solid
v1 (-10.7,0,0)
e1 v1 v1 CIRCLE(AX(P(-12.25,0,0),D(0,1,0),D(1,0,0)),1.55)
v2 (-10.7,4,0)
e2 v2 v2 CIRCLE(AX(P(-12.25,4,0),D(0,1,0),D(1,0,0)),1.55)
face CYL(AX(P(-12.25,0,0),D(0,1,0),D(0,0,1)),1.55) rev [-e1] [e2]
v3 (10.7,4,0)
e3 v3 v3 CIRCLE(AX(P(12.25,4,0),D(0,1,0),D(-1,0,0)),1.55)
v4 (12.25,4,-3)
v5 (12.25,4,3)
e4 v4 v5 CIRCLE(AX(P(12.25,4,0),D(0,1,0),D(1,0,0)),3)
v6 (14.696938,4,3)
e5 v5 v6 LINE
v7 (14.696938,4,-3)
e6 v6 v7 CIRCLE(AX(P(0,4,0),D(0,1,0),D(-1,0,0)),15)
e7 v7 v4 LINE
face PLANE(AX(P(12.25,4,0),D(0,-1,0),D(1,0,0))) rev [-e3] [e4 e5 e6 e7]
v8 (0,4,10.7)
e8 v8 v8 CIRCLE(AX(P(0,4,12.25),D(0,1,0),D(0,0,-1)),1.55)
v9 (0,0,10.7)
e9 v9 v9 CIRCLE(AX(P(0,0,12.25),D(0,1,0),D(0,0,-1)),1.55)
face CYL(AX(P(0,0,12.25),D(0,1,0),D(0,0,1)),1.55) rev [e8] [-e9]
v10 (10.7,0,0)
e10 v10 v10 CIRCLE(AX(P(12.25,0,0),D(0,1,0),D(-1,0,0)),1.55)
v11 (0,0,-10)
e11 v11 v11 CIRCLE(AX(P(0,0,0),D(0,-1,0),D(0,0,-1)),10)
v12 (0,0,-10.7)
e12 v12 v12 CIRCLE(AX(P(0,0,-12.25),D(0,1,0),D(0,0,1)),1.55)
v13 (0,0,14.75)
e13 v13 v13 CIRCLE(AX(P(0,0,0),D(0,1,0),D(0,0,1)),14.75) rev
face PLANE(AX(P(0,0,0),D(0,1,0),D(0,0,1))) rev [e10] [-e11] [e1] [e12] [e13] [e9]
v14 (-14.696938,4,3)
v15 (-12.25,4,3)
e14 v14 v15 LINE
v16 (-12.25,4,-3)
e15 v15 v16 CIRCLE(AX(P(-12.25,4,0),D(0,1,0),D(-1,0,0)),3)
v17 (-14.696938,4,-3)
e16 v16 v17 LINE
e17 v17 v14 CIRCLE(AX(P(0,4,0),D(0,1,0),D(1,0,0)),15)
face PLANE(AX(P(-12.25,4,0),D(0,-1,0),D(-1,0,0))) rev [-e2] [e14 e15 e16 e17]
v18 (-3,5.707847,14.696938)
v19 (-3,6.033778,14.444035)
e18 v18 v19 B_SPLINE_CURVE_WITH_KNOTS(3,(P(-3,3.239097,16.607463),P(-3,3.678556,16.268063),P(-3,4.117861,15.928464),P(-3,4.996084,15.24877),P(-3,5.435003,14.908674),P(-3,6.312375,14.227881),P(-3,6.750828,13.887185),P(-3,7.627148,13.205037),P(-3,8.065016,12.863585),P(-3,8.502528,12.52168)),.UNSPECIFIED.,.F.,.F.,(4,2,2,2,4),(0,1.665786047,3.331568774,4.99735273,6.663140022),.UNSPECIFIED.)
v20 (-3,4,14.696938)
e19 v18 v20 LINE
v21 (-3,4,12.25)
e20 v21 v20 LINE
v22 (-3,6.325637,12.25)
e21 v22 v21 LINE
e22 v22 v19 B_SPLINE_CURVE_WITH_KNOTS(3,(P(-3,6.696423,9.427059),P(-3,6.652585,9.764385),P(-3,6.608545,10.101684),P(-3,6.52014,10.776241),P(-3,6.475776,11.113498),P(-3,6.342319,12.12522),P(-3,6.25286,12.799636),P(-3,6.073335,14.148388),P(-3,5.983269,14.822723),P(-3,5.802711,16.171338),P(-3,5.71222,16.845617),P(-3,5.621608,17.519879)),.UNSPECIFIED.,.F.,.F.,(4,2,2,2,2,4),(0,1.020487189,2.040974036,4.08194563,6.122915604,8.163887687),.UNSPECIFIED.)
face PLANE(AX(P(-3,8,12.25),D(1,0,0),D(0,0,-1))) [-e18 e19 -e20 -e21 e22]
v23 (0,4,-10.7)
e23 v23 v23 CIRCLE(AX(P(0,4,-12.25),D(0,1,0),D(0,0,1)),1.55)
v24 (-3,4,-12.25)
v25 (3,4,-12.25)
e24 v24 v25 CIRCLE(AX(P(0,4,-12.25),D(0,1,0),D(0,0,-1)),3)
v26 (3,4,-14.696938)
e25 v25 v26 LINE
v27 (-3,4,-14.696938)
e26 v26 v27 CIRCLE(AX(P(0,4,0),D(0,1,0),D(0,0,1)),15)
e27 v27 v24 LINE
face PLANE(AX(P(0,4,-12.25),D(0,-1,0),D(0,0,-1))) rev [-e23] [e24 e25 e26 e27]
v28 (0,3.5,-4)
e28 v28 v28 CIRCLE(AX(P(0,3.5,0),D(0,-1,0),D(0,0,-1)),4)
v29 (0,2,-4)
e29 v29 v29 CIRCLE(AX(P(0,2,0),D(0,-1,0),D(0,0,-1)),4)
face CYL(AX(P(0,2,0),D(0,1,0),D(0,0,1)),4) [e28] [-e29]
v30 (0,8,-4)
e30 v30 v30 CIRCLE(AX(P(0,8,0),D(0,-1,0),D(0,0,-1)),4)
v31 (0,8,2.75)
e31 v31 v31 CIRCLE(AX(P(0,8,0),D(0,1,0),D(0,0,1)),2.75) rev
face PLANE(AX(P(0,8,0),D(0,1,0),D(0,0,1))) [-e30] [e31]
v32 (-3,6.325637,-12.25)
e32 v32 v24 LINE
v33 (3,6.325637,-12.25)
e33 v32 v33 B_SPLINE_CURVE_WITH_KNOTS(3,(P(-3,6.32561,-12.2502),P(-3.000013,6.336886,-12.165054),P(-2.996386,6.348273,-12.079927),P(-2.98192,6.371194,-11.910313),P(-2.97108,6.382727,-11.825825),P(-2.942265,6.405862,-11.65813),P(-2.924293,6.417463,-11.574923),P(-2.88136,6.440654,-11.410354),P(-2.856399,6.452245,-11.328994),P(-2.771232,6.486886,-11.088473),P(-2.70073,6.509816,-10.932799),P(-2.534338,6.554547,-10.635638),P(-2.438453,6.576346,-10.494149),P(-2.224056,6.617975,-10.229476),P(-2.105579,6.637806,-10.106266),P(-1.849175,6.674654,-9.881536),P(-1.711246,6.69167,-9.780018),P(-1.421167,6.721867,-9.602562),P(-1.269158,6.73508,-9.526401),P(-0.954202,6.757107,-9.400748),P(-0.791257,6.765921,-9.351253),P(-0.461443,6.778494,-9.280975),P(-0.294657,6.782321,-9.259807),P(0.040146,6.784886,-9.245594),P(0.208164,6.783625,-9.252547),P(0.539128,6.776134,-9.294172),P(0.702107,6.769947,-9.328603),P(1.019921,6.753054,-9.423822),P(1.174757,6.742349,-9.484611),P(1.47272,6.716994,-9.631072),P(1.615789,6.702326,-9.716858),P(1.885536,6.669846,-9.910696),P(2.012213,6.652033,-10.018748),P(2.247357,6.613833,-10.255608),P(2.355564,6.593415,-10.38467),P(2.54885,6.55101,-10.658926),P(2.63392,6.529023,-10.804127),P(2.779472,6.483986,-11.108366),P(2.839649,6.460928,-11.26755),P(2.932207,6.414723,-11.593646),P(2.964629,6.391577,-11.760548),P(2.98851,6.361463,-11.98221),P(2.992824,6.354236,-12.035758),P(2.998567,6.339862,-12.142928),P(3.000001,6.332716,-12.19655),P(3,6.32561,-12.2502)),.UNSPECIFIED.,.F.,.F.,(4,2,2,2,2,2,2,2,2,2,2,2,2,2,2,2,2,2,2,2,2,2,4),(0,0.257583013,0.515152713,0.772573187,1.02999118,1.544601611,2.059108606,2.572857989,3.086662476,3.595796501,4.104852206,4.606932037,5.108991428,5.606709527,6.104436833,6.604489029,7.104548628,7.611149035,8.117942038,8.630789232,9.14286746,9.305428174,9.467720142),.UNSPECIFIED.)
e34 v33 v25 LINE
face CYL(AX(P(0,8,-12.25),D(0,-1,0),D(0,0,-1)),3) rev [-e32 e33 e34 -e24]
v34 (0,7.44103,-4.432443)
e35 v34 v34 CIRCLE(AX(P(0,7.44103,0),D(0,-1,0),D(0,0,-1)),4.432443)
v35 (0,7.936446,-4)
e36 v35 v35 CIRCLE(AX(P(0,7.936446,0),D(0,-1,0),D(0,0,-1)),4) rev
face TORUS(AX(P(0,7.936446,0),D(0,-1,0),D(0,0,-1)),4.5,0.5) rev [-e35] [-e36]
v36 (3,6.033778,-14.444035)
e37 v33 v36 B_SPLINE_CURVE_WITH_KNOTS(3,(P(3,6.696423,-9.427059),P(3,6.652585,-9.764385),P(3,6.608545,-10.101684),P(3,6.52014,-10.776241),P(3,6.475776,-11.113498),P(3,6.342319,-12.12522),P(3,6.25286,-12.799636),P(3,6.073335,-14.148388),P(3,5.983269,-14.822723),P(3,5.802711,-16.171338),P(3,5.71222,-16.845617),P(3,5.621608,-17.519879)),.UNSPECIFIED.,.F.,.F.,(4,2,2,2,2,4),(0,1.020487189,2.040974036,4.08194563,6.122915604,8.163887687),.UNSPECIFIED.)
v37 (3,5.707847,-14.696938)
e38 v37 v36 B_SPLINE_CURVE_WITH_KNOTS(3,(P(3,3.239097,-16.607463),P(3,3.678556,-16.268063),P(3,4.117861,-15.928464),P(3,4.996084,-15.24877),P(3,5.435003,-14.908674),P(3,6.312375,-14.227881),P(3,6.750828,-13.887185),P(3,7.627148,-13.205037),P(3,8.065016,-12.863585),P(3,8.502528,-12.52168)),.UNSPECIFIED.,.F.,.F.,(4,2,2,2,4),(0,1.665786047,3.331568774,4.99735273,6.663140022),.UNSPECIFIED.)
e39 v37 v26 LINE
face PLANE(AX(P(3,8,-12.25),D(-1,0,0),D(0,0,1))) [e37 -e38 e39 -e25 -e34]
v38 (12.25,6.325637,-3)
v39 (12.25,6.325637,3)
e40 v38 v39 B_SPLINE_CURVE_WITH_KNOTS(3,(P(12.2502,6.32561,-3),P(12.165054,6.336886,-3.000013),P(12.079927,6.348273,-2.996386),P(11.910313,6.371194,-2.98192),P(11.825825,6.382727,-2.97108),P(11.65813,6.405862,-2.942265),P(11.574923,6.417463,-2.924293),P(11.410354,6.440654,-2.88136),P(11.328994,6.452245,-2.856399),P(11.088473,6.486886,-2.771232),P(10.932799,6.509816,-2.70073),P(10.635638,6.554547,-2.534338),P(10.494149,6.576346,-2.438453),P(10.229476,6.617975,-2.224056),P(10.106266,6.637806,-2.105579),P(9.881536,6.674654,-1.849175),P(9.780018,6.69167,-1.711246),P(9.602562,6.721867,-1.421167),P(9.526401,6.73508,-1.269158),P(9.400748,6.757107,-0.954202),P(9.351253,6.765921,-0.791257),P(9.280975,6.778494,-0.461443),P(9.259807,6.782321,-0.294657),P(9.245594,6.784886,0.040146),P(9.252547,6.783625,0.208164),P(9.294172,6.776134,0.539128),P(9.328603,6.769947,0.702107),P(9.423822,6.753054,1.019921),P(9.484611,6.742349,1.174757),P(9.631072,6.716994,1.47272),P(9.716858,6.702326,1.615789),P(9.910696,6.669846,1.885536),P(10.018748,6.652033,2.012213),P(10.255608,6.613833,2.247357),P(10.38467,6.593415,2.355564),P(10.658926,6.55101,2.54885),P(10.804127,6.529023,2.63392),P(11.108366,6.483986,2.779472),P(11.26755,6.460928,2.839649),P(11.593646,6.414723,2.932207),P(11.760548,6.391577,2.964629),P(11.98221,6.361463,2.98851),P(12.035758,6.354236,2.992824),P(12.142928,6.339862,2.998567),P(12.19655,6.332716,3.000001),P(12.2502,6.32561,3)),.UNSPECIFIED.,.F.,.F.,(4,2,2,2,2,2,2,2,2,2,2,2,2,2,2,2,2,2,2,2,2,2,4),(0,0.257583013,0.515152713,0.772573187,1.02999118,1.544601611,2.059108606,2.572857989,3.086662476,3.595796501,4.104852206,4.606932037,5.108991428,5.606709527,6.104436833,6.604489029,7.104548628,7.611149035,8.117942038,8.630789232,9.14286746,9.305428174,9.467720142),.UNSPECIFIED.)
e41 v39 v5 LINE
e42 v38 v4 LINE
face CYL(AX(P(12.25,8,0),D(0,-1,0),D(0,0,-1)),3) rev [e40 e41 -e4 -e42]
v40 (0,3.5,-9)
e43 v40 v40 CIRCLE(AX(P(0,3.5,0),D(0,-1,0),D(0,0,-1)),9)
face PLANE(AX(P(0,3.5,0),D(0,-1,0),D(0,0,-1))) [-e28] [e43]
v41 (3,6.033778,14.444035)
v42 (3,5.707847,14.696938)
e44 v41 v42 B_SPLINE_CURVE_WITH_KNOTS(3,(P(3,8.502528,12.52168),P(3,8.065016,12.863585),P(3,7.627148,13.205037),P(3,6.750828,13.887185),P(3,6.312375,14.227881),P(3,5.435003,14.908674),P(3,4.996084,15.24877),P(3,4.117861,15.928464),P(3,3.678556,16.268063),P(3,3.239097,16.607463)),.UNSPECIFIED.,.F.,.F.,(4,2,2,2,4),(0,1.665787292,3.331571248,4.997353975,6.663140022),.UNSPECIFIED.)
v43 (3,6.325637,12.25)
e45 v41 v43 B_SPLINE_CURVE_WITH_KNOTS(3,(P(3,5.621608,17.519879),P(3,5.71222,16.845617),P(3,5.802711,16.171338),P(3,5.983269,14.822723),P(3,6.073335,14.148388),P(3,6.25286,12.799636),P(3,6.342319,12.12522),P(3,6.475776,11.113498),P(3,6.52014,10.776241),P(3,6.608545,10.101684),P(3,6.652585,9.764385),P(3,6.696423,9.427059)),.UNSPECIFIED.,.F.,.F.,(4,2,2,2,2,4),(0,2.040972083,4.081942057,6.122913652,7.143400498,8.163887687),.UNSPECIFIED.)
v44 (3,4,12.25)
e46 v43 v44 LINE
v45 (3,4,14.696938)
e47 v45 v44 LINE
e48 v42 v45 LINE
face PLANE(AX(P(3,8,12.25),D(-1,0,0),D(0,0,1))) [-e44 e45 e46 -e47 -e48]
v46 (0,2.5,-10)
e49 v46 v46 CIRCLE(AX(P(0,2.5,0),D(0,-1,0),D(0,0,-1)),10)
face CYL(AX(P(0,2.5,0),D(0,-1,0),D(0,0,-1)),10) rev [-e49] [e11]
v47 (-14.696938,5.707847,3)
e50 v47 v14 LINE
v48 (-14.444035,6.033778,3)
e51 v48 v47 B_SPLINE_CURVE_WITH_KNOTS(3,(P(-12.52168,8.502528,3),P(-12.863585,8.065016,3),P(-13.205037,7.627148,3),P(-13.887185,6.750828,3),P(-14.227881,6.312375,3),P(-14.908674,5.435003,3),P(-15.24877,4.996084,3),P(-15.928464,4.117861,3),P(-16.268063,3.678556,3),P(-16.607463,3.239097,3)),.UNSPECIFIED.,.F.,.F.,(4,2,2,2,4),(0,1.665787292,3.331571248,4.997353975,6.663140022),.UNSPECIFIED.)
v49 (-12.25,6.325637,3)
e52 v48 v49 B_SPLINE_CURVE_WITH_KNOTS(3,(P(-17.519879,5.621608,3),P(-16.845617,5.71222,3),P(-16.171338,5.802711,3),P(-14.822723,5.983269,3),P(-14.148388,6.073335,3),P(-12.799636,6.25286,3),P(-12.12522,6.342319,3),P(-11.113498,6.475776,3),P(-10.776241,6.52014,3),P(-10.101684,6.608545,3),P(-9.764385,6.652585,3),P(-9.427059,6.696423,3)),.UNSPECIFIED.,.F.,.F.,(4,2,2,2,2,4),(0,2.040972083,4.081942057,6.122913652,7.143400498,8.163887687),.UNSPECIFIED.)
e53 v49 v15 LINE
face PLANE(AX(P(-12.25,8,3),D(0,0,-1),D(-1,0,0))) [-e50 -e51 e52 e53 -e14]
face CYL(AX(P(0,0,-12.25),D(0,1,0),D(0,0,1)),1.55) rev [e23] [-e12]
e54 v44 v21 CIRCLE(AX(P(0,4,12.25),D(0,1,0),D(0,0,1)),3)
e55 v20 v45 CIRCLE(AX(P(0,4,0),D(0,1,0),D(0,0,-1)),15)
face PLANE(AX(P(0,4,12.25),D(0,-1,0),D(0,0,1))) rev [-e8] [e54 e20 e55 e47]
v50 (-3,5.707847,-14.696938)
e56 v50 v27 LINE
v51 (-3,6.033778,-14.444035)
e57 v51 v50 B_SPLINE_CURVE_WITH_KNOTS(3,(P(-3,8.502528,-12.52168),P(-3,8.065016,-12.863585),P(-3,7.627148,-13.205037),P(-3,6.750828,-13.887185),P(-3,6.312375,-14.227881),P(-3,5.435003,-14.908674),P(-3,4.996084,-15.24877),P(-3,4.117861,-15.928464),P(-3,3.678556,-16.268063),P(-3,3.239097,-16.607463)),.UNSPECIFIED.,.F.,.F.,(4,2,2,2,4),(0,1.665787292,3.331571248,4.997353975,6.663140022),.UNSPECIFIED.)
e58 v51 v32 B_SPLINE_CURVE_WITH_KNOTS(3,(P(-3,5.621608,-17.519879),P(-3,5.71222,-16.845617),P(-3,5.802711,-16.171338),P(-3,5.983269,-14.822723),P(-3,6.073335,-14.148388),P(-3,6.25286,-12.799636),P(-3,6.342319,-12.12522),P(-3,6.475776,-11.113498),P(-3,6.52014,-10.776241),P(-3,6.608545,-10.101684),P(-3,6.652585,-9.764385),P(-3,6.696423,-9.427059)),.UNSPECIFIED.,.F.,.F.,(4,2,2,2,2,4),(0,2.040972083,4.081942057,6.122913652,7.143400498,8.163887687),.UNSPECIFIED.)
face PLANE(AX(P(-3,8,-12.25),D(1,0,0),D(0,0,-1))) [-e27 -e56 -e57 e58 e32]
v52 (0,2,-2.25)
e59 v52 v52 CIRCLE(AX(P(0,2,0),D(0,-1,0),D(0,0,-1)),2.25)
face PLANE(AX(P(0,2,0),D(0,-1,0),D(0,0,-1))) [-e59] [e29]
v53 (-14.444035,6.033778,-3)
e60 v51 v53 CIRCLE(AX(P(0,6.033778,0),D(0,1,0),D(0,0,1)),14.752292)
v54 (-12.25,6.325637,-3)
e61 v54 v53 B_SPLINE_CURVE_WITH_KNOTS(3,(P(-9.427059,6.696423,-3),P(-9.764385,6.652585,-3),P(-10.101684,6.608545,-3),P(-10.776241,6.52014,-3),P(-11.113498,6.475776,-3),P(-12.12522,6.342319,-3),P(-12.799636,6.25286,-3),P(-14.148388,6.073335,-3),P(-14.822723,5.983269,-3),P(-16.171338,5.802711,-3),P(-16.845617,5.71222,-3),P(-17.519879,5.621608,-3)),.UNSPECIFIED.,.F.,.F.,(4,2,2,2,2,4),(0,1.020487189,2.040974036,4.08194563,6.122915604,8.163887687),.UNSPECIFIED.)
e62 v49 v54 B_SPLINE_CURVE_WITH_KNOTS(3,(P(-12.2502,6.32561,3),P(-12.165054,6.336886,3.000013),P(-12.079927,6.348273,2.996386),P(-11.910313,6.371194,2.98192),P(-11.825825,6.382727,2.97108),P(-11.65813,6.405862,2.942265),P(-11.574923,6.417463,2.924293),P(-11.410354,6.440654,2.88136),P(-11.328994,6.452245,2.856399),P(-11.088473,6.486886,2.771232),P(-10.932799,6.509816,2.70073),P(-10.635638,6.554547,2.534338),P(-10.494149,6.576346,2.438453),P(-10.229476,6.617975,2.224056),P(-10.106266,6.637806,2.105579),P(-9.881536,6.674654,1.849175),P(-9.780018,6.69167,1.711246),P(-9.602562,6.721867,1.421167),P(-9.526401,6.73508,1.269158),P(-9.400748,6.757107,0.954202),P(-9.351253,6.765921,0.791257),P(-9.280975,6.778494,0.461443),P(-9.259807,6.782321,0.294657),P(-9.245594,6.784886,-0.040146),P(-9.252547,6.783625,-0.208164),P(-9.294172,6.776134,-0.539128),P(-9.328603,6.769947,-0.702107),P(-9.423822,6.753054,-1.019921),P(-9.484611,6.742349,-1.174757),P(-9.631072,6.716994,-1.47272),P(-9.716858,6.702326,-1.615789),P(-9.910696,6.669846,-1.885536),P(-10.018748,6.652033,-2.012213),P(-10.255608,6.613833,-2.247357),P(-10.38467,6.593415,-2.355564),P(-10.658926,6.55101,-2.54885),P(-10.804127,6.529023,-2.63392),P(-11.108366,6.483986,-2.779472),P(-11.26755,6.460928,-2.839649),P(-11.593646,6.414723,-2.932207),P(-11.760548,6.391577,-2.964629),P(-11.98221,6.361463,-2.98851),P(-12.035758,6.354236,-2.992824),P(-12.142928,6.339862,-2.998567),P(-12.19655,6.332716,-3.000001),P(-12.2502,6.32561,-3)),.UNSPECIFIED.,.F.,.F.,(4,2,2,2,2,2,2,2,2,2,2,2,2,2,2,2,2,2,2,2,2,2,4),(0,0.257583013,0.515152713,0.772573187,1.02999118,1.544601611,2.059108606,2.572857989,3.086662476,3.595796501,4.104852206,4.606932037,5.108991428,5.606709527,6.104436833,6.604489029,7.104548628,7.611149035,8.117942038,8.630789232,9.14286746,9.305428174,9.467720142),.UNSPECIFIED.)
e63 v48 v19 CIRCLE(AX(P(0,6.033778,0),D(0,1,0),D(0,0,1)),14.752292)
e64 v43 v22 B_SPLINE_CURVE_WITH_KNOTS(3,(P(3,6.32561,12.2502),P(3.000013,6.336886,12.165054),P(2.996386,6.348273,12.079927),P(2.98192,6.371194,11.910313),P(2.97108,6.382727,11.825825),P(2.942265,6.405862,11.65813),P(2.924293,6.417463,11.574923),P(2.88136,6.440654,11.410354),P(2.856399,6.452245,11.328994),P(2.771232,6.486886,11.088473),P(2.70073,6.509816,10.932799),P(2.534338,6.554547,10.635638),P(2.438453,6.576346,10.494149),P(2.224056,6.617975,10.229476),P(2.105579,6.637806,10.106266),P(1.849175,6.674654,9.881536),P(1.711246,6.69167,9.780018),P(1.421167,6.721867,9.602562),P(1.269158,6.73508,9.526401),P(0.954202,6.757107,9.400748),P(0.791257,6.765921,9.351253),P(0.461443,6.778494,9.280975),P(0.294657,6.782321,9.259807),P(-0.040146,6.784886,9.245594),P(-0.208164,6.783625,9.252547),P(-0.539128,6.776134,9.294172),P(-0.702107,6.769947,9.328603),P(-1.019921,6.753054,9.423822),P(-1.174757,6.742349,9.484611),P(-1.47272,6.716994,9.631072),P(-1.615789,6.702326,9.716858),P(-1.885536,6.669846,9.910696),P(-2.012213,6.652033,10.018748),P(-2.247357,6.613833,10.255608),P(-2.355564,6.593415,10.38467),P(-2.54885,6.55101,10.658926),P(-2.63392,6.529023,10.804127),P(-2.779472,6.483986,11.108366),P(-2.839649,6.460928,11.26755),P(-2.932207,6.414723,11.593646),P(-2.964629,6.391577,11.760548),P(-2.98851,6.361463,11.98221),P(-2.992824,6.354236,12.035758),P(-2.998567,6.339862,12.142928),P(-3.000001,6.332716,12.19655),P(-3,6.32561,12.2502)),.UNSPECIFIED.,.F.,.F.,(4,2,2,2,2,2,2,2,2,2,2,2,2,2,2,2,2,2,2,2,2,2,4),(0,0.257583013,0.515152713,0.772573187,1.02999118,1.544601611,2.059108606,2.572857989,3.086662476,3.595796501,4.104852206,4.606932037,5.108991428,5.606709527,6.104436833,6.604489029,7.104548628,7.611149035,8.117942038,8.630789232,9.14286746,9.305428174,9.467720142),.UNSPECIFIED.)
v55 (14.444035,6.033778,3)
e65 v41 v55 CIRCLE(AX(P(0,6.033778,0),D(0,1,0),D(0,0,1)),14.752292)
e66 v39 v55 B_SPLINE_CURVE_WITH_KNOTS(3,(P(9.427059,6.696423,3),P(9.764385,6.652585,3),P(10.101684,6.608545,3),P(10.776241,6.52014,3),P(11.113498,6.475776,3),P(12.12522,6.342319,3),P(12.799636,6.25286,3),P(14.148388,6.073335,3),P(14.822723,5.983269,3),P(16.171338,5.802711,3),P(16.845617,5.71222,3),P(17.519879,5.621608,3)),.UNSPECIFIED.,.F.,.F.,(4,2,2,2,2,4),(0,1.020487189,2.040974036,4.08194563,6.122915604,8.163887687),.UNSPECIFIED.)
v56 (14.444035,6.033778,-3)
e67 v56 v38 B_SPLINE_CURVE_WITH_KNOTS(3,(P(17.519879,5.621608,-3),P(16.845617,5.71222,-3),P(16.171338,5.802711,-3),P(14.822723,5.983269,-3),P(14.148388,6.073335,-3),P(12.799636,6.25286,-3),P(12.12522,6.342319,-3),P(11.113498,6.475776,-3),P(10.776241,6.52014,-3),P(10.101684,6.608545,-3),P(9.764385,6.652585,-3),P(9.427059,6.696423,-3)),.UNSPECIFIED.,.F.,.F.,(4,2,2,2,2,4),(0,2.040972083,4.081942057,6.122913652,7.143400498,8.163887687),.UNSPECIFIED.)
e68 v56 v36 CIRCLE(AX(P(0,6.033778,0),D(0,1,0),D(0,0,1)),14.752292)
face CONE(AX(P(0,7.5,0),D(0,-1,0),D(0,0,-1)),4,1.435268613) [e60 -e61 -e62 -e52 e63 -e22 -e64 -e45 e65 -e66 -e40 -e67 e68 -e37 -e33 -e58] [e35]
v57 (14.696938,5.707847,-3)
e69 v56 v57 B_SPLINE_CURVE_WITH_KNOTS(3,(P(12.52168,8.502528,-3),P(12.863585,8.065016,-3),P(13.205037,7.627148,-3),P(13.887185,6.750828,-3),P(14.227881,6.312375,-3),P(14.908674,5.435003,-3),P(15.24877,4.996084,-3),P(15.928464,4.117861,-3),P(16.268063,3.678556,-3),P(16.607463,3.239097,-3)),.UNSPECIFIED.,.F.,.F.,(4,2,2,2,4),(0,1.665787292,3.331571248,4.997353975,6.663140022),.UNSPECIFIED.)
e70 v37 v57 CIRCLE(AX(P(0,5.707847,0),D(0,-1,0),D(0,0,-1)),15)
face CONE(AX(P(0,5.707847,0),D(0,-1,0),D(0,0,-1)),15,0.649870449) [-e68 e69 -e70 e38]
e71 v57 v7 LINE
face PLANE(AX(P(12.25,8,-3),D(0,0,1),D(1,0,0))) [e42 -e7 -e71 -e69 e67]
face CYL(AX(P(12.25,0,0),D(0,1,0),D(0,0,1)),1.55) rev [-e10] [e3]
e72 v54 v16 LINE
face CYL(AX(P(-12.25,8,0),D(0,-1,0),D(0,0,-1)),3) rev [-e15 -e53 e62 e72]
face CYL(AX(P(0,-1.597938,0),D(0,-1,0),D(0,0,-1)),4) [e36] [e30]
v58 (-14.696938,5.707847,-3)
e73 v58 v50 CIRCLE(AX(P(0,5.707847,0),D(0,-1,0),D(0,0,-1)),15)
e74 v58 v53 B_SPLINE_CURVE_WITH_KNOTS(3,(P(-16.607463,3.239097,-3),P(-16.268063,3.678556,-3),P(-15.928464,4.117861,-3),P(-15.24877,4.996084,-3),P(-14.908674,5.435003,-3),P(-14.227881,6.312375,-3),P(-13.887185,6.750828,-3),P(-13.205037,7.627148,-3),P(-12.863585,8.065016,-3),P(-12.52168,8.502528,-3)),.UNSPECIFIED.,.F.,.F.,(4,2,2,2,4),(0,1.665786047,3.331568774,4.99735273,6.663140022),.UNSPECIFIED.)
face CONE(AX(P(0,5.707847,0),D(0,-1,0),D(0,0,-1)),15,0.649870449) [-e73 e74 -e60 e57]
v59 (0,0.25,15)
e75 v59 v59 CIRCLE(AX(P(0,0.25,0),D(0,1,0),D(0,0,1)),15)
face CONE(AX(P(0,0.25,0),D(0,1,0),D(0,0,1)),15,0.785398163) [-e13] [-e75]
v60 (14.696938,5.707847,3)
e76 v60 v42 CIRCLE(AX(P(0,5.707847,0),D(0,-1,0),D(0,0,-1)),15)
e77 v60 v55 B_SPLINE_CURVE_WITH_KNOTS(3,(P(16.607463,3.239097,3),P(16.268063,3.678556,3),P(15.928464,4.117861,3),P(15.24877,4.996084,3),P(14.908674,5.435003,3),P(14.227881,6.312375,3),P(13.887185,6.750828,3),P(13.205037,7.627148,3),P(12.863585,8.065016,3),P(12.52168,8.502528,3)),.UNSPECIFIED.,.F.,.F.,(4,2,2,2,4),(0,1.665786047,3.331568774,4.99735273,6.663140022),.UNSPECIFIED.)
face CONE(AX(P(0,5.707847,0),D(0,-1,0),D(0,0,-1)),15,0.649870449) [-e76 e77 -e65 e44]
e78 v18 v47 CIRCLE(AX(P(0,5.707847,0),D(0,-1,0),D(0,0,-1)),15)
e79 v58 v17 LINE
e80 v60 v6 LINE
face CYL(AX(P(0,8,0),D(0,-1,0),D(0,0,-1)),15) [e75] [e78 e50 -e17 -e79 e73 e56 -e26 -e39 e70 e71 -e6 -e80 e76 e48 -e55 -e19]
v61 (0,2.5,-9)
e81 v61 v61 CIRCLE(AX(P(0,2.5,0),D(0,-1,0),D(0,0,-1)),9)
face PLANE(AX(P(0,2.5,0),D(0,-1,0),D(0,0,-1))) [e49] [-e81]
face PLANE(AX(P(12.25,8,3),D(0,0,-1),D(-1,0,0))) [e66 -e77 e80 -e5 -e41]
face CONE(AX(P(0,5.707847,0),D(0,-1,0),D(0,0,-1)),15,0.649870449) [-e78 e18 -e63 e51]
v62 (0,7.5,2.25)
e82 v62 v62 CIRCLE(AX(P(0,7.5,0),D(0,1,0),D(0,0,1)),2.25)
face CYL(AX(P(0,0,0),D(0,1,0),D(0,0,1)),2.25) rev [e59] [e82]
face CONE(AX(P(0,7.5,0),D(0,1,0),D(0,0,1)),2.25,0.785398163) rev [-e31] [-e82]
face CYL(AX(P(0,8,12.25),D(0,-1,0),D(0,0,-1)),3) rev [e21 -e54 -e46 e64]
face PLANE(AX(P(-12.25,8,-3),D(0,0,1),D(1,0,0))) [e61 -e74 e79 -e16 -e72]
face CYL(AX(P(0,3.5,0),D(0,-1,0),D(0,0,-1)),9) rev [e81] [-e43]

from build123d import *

# Parameters (mm, degrees)
SKETCH_1_R               = 15
EXTRUDE_314_DEPTH        = 8
SKETCH_3_R               = 10
CUT_EXTRUDE_1_DEPTH      = 2.5
SKETCH_5_R               = 9
CUT_EXTRUDE_3_DEPTH      = 1
SKETCH_6_R               = 4
EXTRUDE_2_DEPTH          = 1.5
SKETCH_7_R               = 2.25
CUT_EXTRUDE_4_DEPTH      = 23.671568098
CHAMFER_3_SIZE           = 0.5
CHAMFER_4_SIZE           = 0.25
CHAMFER_4_SIZE2          = 0.292152675
CHAMFER_5_SIZE           = 0.25
FILLET_1_R               = 0.5
CUT_EXTRUDE_START        = 4
CUT_EXTRUDE_6_DEPTH      = 19.671568265
SKETCH_9_R               = 1.55
CUT_EXTRUDE_7_DEPTH      = 22.587033302
PATTERN_CIRCULAR_1_COUNT = 4


with BuildPart() as part:
    # Эскиз1 → Extrude 314 (new body)
    with BuildSketch(Plane(origin=(0, 0, 0), x_dir=(1, 0, 0), z_dir=(0, 1, 0))):
        Circle(SKETCH_1_R)
    extrude(amount=EXTRUDE_314_DEPTH)

    # Эскиз2 → Вырез-Повернуть1 (revolve, cut)
    with BuildSketch(Plane.XY):
        Polygon((4, 8), (15, 8), (15, 6), (4, 7.5), align=None)
    revolve(axis=Axis((0, -1.597938144, 0), (0, 1, 0)), mode=Mode.SUBTRACT)

    # Эскиз3 → Вырез-Вытянуть1 (cut)
    with BuildSketch(Plane(origin=(0, 0, 0), x_dir=(-1, 0, 0), z_dir=(0, -1, 0))):
        Circle(SKETCH_3_R)
    extrude(amount=-CUT_EXTRUDE_1_DEPTH, mode=Mode.SUBTRACT)

    # Эскиз5 → Вырез-Вытянуть3 (cut)
    with BuildSketch(Plane.XZ.offset(-2.5)):
        Circle(SKETCH_5_R)
    extrude(amount=-CUT_EXTRUDE_3_DEPTH, mode=Mode.SUBTRACT)

    # Эскиз6 → Бобышка-Вытянуть2 (add)
    with BuildSketch(Plane.XZ.offset(-3.5)):
        Circle(SKETCH_6_R)
    extrude(amount=EXTRUDE_2_DEPTH)

    # Эскиз7 → Вырез-Вытянуть4 (cut, through all)
    with BuildSketch(Plane(origin=(0, 8, 0), x_dir=(1, 0, 0), z_dir=(0, 1, 0))):
        Circle(SKETCH_7_R)
    extrude(amount=-CUT_EXTRUDE_4_DEPTH, mode=Mode.SUBTRACT)

    # Фаска3
    chamfer_3_edges = [part.edges().sort_by_distance(p)[0] for p in [
        (-2.25, 8, 0),
    ]]
    chamfer(chamfer_3_edges, length=CHAMFER_3_SIZE)

    # Фаска4
    chamfer_4_edges = [part.edges().sort_by_distance(p)[0] for p in [
        (-15, 6, 0),
    ]]
    chamfer_4_side = [part.faces().sort_by_distance(p)[0] for p in [
        (-9.5, 6.75, 0),
    ]]
    chamfer(chamfer_4_edges, length=CHAMFER_4_SIZE, length2=CHAMFER_4_SIZE2, reference=chamfer_4_side[0])

    # Фаска5
    chamfer_5_edges = [part.edges().sort_by_distance(p)[0] for p in [
        (-15, 0, 0),
    ]]
    chamfer(chamfer_5_edges, length=CHAMFER_5_SIZE)

    # Скругление1
    fillet_1_edges = [part.edges().sort_by_distance(p)[0] for p in [
        (-4, 7.5, 0),
    ]]
    fillet(fillet_1_edges, radius=FILLET_1_R)

    # Эскиз8 → Вырез-Вытянуть6 (cut, through all)
    with BuildSketch(Plane(origin=(0, 0, 0), x_dir=(1, 0, 0), z_dir=(0, 1, 0)).offset(CUT_EXTRUDE_START)):
        with BuildLine():
            Line((3, 12.25), (3, 14.696938457))
            ThreePointArc((3, 14.696938457), (0, 15), (-3, 14.696938457))
            Line((-3, 14.696938457), (-3, 12.25))
            ThreePointArc((-3, 12.25), (0, 9.25), (3, 12.25))
        make_face()
    cut_extrude_6 = extrude(amount=CUT_EXTRUDE_6_DEPTH, mode=Mode.SUBTRACT)

    # Эскиз9 → Вырез-Вытянуть7 (cut, through all)
    with BuildSketch(Plane(origin=(0, 4, 0), x_dir=(1, 0, 0), z_dir=(0, 1, 0))):
        with Locations((0, 12.25)):
            Circle(SKETCH_9_R)
    cut_extrude_7 = extrude(amount=-CUT_EXTRUDE_7_DEPTH, mode=Mode.SUBTRACT)

    # Круговой массив1: Вырез-Вытянуть6, Вырез-Вытянуть7 ×4 about axis
    pattern_circular_1_axis = Axis((0, 5.707847325, 0), (0, -1, 0))
    add([cut_extrude_6.rotate(pattern_circular_1_axis, i * 360 / PATTERN_CIRCULAR_1_COUNT) for i in range(1, PATTERN_CIRCULAR_1_COUNT)], mode=Mode.SUBTRACT)
    add([cut_extrude_7.rotate(pattern_circular_1_axis, i * 360 / PATTERN_CIRCULAR_1_COUNT) for i in range(1, PATTERN_CIRCULAR_1_COUNT)], mode=Mode.SUBTRACT)


solid = part.part
